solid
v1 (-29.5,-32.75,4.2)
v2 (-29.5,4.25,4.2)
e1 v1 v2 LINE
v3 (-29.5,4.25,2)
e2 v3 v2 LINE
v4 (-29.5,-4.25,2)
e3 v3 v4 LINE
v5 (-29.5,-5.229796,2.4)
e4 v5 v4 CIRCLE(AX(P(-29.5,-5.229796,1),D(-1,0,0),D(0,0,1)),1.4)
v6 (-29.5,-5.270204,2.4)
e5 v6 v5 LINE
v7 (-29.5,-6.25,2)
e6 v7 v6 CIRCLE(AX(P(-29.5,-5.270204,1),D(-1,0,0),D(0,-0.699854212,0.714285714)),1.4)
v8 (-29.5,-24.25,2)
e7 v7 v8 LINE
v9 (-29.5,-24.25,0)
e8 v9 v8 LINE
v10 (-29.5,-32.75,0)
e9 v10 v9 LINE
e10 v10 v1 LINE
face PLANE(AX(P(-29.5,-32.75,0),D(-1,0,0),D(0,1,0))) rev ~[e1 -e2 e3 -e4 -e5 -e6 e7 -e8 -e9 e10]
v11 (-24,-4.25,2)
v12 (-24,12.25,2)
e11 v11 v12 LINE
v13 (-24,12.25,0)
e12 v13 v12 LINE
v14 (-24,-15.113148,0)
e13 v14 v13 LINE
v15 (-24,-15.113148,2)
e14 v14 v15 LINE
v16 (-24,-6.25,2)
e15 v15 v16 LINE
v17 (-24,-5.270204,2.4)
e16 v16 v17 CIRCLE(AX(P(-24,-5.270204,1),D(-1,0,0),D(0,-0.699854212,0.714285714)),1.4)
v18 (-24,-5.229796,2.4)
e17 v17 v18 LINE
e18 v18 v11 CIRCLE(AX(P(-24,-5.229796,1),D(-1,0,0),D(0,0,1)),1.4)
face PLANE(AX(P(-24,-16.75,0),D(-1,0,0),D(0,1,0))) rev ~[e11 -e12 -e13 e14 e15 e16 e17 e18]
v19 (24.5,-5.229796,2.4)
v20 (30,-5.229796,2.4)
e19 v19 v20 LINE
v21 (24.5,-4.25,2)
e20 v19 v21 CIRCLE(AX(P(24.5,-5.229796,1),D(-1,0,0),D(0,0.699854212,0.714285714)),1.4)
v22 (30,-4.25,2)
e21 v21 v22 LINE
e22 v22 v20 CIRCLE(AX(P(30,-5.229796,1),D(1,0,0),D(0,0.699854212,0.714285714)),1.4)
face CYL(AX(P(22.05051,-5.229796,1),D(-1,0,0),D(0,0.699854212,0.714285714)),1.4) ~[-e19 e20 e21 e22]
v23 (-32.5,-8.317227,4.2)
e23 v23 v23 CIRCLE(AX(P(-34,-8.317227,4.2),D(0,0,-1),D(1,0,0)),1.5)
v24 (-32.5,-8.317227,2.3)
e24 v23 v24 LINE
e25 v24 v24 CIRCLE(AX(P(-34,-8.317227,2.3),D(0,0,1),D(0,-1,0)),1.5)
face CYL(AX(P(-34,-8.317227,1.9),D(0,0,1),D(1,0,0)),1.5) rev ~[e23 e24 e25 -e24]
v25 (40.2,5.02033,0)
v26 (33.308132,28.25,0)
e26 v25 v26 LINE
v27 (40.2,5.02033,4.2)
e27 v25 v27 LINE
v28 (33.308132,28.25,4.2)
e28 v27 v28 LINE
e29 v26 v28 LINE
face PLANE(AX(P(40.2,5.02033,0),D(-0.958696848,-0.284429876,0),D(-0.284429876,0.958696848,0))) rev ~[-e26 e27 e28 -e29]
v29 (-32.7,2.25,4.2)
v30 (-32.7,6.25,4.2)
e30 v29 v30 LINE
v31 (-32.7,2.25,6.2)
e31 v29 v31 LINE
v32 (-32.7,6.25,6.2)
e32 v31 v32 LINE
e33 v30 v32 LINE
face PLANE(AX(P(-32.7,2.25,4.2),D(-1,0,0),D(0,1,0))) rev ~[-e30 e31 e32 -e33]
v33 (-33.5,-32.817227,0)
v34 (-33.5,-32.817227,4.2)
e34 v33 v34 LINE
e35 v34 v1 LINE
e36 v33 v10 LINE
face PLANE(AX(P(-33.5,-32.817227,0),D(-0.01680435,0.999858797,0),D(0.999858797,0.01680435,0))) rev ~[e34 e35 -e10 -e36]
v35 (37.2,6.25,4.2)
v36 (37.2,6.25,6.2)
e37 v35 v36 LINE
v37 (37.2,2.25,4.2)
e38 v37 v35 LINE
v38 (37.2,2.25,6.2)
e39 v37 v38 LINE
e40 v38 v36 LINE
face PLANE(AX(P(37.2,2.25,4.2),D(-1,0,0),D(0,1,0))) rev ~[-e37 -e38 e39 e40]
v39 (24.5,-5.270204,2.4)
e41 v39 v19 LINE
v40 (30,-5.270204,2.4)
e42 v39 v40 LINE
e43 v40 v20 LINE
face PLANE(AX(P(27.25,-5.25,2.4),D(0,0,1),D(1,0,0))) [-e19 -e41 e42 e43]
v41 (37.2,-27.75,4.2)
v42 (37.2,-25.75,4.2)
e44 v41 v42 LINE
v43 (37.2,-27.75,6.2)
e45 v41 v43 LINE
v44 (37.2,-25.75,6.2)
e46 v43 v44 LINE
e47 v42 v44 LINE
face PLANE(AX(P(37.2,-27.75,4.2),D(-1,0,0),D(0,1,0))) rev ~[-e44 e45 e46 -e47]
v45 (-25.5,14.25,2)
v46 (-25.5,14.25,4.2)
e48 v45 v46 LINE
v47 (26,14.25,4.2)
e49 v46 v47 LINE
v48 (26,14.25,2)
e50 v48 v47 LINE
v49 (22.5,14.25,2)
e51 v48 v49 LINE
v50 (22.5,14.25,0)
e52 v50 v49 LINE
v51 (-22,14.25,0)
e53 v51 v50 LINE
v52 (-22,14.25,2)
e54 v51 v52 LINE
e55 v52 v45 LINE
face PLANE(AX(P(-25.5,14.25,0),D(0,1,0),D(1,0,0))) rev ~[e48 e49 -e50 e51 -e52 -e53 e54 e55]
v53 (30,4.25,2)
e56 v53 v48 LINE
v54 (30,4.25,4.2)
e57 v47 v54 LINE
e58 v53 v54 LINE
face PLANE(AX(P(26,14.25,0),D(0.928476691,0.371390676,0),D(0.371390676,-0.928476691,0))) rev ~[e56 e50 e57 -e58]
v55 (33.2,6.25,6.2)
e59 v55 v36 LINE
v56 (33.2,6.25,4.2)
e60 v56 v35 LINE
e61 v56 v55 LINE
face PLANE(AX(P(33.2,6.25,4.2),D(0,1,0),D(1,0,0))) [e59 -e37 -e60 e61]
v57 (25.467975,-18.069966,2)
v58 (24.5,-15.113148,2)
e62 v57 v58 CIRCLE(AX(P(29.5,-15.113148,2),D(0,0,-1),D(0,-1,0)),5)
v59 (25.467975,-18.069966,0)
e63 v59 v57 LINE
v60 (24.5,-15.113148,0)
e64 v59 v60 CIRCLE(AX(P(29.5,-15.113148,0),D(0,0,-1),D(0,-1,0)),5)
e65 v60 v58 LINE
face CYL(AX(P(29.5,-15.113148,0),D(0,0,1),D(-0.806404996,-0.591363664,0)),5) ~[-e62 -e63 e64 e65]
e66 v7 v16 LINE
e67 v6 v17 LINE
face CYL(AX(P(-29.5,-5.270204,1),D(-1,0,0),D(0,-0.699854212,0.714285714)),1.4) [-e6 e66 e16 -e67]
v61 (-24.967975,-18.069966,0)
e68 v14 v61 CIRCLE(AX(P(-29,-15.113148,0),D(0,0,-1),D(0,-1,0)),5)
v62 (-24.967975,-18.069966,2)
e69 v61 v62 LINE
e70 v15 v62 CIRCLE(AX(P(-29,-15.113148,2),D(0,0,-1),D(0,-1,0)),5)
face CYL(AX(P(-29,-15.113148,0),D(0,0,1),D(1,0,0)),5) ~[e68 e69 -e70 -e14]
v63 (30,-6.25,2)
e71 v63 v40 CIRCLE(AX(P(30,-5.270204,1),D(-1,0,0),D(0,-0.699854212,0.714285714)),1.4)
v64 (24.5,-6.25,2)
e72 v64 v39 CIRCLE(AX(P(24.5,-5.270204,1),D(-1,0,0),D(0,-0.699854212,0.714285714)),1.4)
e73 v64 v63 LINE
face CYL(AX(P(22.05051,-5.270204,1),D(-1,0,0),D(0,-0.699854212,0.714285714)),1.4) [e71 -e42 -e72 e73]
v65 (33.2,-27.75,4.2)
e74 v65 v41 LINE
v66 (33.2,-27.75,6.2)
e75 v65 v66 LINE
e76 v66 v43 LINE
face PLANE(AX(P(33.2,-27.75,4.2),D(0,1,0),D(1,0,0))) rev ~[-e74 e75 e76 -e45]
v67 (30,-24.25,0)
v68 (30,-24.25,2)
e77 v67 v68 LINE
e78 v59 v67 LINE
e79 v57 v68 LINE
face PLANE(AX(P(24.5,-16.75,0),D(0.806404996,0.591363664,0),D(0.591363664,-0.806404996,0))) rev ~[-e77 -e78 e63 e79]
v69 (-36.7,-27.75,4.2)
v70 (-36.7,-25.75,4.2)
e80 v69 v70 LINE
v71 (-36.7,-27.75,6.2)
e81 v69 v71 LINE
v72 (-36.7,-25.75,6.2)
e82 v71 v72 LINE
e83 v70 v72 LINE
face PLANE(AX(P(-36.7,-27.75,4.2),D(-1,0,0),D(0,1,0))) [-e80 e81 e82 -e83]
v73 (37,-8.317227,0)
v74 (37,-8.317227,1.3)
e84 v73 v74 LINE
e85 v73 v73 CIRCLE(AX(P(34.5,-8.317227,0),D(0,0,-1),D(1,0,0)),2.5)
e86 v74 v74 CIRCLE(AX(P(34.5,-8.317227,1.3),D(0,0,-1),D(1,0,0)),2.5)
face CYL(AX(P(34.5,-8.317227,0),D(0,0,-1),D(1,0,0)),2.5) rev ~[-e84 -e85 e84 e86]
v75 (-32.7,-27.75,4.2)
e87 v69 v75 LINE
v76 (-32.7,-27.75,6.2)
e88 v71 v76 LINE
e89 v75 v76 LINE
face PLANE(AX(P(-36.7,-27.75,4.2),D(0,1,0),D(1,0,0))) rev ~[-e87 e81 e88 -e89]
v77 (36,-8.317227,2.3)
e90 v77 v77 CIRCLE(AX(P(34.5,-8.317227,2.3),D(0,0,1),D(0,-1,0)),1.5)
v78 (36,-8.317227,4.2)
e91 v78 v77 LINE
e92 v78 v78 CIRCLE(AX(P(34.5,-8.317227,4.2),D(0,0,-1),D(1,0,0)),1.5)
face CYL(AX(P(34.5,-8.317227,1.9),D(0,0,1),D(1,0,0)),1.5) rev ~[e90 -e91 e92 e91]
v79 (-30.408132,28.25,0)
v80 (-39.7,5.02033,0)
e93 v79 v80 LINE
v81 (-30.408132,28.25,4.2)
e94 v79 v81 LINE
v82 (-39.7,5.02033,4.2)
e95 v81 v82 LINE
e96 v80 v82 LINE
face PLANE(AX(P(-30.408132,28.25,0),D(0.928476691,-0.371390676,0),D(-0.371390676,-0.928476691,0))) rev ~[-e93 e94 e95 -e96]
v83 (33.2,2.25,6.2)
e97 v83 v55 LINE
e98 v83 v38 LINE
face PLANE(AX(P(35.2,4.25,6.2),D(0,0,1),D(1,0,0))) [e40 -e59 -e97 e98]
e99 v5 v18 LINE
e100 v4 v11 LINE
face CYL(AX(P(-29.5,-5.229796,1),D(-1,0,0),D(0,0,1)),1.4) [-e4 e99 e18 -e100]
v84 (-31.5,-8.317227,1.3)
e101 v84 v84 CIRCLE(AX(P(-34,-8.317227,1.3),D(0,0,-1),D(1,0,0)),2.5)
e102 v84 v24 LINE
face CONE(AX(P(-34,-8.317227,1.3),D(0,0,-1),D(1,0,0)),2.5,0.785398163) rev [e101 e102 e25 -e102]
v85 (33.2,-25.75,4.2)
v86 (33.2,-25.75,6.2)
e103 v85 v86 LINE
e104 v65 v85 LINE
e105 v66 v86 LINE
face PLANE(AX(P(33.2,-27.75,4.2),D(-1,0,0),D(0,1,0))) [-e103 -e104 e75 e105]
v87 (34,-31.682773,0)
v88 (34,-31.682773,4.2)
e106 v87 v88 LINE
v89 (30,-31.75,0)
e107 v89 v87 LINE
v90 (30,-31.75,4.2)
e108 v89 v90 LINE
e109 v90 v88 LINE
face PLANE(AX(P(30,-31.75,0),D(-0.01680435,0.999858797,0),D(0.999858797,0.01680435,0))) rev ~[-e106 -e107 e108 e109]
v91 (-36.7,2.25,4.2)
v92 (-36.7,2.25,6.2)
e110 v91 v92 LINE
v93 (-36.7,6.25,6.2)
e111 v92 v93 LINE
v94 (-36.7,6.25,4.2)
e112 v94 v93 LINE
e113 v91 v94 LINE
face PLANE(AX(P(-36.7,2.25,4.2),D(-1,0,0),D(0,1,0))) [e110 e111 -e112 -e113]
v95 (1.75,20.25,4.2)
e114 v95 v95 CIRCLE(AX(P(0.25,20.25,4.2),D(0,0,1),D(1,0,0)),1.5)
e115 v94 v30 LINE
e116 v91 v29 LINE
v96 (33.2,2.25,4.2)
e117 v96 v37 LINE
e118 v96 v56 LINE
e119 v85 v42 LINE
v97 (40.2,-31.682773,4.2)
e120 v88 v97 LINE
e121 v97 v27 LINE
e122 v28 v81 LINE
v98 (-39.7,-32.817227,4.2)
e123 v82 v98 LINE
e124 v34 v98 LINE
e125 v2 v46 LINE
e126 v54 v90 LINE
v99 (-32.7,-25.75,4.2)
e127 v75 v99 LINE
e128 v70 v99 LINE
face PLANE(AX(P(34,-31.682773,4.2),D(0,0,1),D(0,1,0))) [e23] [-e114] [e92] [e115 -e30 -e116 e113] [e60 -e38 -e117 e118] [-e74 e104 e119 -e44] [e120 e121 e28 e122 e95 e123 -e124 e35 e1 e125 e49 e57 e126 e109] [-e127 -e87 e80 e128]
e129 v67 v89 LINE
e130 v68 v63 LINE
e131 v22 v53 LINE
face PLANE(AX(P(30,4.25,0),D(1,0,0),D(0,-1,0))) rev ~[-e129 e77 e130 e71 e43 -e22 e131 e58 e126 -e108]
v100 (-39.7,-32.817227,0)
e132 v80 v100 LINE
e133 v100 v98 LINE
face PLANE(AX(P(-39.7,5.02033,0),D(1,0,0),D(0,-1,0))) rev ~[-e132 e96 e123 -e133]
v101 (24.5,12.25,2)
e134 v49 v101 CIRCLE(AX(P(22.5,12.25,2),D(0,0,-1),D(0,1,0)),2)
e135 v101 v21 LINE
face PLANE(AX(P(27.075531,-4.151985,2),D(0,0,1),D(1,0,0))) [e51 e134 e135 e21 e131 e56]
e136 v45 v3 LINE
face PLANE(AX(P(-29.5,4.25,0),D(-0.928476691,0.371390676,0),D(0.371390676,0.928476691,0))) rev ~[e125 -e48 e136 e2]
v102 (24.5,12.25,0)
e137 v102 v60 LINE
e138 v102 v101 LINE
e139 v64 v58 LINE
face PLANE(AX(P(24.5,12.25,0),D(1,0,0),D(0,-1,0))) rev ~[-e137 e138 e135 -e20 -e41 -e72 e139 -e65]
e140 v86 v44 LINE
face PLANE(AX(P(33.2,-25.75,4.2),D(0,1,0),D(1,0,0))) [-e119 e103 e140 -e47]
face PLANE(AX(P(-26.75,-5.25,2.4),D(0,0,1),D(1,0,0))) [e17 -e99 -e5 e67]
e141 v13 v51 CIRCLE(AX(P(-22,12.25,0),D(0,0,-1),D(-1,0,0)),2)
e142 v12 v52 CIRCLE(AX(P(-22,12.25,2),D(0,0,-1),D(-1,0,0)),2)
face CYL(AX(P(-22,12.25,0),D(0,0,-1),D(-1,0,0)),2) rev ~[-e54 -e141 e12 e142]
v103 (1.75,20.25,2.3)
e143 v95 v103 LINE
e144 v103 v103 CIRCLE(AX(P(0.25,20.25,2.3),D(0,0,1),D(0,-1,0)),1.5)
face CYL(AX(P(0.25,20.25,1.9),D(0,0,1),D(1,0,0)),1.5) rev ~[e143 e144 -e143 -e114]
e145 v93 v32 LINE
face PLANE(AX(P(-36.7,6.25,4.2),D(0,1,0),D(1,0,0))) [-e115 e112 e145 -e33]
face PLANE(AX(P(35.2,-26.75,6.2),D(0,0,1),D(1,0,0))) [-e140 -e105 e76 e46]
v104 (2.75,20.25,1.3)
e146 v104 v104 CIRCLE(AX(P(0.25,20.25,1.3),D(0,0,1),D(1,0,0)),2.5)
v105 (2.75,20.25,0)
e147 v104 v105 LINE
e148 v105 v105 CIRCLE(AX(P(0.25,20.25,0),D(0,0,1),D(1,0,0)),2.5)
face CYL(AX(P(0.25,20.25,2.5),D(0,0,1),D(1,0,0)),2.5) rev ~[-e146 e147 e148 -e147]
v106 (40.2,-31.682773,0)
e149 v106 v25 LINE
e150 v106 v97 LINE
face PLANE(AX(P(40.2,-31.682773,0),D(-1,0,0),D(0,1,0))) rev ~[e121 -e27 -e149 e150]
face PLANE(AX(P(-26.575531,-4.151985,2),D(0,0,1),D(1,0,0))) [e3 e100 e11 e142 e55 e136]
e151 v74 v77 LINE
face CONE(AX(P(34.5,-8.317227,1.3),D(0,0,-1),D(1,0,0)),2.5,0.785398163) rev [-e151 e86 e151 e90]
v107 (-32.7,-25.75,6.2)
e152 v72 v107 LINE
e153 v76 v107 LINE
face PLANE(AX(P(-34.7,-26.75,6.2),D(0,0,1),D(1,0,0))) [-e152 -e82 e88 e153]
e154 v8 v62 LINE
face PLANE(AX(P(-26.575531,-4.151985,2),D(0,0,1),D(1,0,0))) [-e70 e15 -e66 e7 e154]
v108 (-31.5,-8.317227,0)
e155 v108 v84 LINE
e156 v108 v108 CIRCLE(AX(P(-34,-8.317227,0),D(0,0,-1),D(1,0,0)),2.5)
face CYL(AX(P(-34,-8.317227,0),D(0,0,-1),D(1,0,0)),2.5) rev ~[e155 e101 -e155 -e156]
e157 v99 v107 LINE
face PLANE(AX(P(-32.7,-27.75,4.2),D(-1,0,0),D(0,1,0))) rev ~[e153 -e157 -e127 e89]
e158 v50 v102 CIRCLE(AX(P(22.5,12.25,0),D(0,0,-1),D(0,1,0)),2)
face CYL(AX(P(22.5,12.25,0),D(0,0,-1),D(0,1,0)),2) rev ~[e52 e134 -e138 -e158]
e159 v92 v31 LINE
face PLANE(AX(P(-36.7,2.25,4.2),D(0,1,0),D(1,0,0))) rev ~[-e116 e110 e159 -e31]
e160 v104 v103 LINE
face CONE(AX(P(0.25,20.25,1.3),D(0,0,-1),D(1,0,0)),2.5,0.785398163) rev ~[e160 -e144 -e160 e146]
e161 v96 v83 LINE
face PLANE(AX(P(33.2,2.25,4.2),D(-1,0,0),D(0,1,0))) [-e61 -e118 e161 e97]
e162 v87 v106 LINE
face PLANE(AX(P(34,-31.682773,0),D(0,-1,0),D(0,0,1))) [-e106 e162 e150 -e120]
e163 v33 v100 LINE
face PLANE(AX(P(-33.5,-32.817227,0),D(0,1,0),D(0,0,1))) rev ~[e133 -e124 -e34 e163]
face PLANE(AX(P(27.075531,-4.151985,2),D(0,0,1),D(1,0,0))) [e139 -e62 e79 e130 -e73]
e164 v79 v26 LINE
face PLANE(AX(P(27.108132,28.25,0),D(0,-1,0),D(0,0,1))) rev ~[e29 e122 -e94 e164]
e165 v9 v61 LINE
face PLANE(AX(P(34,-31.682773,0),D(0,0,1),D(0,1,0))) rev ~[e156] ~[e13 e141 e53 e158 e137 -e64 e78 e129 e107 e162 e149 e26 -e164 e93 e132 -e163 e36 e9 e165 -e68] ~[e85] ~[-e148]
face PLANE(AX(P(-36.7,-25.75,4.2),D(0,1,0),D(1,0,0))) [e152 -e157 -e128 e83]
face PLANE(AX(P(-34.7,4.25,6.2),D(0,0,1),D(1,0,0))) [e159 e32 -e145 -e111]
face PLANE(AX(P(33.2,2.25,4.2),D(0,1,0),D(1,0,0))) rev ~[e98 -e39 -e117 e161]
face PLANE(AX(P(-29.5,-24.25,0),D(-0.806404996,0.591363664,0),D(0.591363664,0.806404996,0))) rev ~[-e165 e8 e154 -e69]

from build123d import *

# Parameters (mm, degrees)
F1_DEPTH      = 2
F2_DEPTH      = 4.2
F3_DEPTH      = 6.2
F4_DEPTH      = 6.2
F5_W          = 4
F5_H          = 2
F5_H_2        = 4
F6_DEPTH      = 2
F7_R          = 2.5
F7_R_2        = 1.5
F8_DEPTH      = 2.5
F9_DEPTH      = 4.5
F10_R         = 5
F12_START     = -1.7
F11_R         = 2.5
F11_R_2       = 1.5
F12_DEPTH     = 5.1
F13_DEPTH     = 4.2
F14_W         = 5.5
F14_H         = 2
F15_DEPTH     = 0.4
F16_T1_DEPTH  = 7.9494897428
F16_T3_DEPTH  = 7.9494897428
F17_S5_R      = 1.5
F17_T6_DEPTH  = 5
F17_S11_R     = 1.5
F17_T12_DEPTH = 5
F17_S17_R     = 1.5
F17_T18_DEPTH = 5


# Not quite as in the source:
# - a fillet or chamfer that OpenCascade refuses, or shapes differently, is made with other operations: its cross-section is extruded or revolved along the edge and cut away or added


with BuildPart() as f1:
    # F0 (on Top) → F1 (new body)
    with BuildSketch(Plane.XY):
        with BuildLine():
            Line((-22, 14.25), (-25.5, 14.25))
            Line((-25.5, 14.25), (-29.5, 4.25))
            Line((-29.5, 4.25), (-29.5, -24.25))
            Line((-29.5, -24.25), (-24, -16.75))
            Line((-24, -16.75), (-24, 12.25))
            ThreePointArc((-24, 12.25), (-23.4142135624, 13.6642135624), (-22, 14.25))
        make_face()
    extrude(amount=F1_DEPTH)



with BuildPart() as f1b:
    # F0 (on Top) → F1, piece 2 (new body)
    with BuildSketch(Plane.XY):
        with BuildLine():
            Line((26, 14.25), (22.5, 14.25))
            ThreePointArc((22.5, 14.25), (23.9142135624, 13.6642135624), (24.5, 12.25))
            Line((24.5, 12.25), (24.5, -16.75))
            Line((24.5, -16.75), (30, -24.25))
            Line((30, -24.25), (30, 4.25))
            Line((30, 4.25), (26, 14.25))
        make_face()
    extrude(amount=F1_DEPTH)


with BuildPart() as f1_1:
    add(f1.part)

    add(f1b.part)  # F2 merges F1b
    # F0 (on Top) → F2 (join)
    with BuildSketch(Plane.XY):
        Polygon((-29.5, 4.25), (-25.5, 14.25), (-22, 14.25), (22.5, 14.25), (26, 14.25), (30, 4.25), (30, -24.25), (30, -31.75), (34, -31.6827731092), (34, 5.0203296143), (27.1081318457, 28.25), (-24.2081318457, 28.25), (-33.5, 5.0203296143), (-33.5, -32.8172268908), (-29.5, -32.75), (-29.5, -24.25), align=None)
    extrude(amount=F2_DEPTH)

    # F3 (add): faces of the model
    f3_faces = [f1_1.faces().sort_by_distance(p)[0] for p in [
        (-33.5, -13.8984486382, 2.1),
        (-28.8540659229, 16.6351648071, 2.1),
    ]]
    extrude(f3_faces, amount=F3_DEPTH, dir=(-1, 0, 0))

    # F4 (add): faces of the model
    f4_faces = [f1_1.faces().sort_by_distance(p)[0] for p in [
        (34, -13.3312217475, 2.1),
        (30.5540659229, 16.6351648071, 2.1),
    ]]
    extrude(f4_faces, amount=F4_DEPTH, dir=(1, 0, 0))

    # F5 (on face) → F6 (join)
    with BuildSketch(Plane.XY.offset(4.2)):
        with Locations((-34.7, -26.75)):
            Rectangle(F5_W, F5_H)
        with Locations((35.2, -26.75)):
            Rectangle(F5_W, F5_H)
        with Locations((35.2, 4.25)):
            Rectangle(F5_W, F5_H_2)
        with Locations((-34.7, 4.25)):
            Rectangle(F5_W, F5_H_2)
    extrude(amount=F6_DEPTH)

    # F7 (on face) → F8 (cut)
    with BuildSketch(Plane(origin=(0, 0, 0), x_dir=(1, 0, 0), z_dir=(0, 0, -1))):
        with Locations((-34, 8.3172268908)):
            Circle(F7_R)
        with Locations((-34, 8.3172268908)):
            Circle(F7_R_2, mode=Mode.SUBTRACT)
        with Locations((34.5, 8.3172268908)):
            Circle(F7_R)
        with Locations((34.5, 8.3172268908)):
            Circle(F7_R_2, mode=Mode.SUBTRACT)
    extrude(amount=-F8_DEPTH, mode=Mode.SUBTRACT)

    # F9 (cut): faces of the model
    f9_faces = [f1_1.faces().sort_by_distance(p)[0] for p in [
        (-34, -8.3172268908, 0),
        (34.5, -8.3172268908, 0),
    ]]
    extrude(f9_faces, amount=-F9_DEPTH, mode=Mode.SUBTRACT)

    # F10
    f10_edges = [f1_1.edges().sort_by_distance(p)[0] for p in [
        (24.5, -16.75, 1),
        (-24, -16.75, 1),
    ]]
    fillet(f10_edges, radius=F10_R)

    # F11 (on face) → F12 (cut)
    with BuildSketch(Plane.XY.offset(4.2).offset(F12_START)):
        with Locations((0.25, 20.25)):
            Circle(F11_R)
        with Locations((0.25, 20.25)):
            Circle(F11_R_2, mode=Mode.SUBTRACT)
    extrude(amount=-F12_DEPTH, mode=Mode.SUBTRACT)

    # F11 (on face) → F13 (cut)
    with BuildSketch(Plane.XY.offset(4.2)):
        with Locations((0.25, 20.25)):
            Circle(F11_R_2)
    extrude(amount=-F13_DEPTH, mode=Mode.SUBTRACT)

    # F14 (on face) → F15 (join)
    with BuildSketch(Plane.XY.offset(2)):
        with Locations((27.25, -5.25)):
            Rectangle(F14_W, F14_H)
        with Locations((-26.75, -5.25)):
            Rectangle(F14_W, F14_H)
    extrude(amount=F15_DEPTH)

    # F16: fillet of radius 1.4 on 4 edges, made by hand

    # F16_s2 → F16_t1 (cut)
    with BuildSketch(Plane.YZ.offset(-29.5)):
        with BuildLine():
            ThreePointArc((-6.25, 2), (-5.7993543651, 2.2961481397), (-5.2702041029, 2.4))
            Line((-5.2702041029, 2.4), (-6.25, 2.4))
            Line((-6.25, 2.4), (-6.25, 2))
        make_face()
        with BuildLine():
            ThreePointArc((-5.2297958971, 2.4), (-4.7006456349, 2.2961481397), (-4.25, 2))
            Line((-4.25, 2), (-4.25, 2.4))
            Line((-4.25, 2.4), (-5.2297958971, 2.4))
        make_face()
    extrude(amount=F16_T1_DEPTH, mode=Mode.SUBTRACT)

    # F16_s4 → F16_t3 (cut)
    with BuildSketch(Plane.YZ.offset(22.0505102572)):
        with BuildLine():
            ThreePointArc((-4.25, 2), (-4.7006456349, 2.2961481397), (-5.2297958971, 2.4))
            Line((-5.2297958971, 2.4), (-4.25, 2.4))
            Line((-4.25, 2.4), (-4.25, 2))
        make_face()
        with BuildLine():
            ThreePointArc((-6.25, 2), (-5.7993543651, 2.2961481397), (-5.2702041029, 2.4))
            Line((-5.2702041029, 2.4), (-6.25, 2.4))
            Line((-6.25, 2.4), (-6.25, 2))
        make_face()
    extrude(amount=F16_T3_DEPTH, mode=Mode.SUBTRACT)

    # F17: chamfer of 1.2 on 3 edges, made by hand


with BuildPart() as f17_tool2:
    # F17_s3 → F17_t4 (revolve)
    with BuildSketch(Plane.XZ.offset(8.3172268908)):
        Polygon((-31.5, 1.3), (-32.7, 2.5), (-31.5, 2.5), align=None)
    revolve(axis=Axis((-34, -8.3172268908, 2.5), (0, 0, -1)))

    # F17_s5 → F17_t6 (cut, symmetric)
    with BuildSketch(Plane.XY.offset(1.9)):
        with Locations((-34, -8.3172268908)):
            Circle(F17_S5_R)
    extrude(amount=F17_T6_DEPTH, both=True, mode=Mode.SUBTRACT)


with BuildPart() as f1_2:
    add(f1_1.part)

    # F17_t1: union F17_tool2
    add(f17_tool2.part)


with BuildPart() as f17_tool8:
    # F17_s9 → F17_t10 (revolve)
    with BuildSketch(Plane.XZ.offset(8.3172268908)):
        Polygon((37, 1.3), (35.8, 2.5), (37, 2.5), align=None)
    revolve(axis=Axis((34.5, -8.3172268908, 2.5), (0, 0, -1)))

    # F17_s11 → F17_t12 (cut, symmetric)
    with BuildSketch(Plane.XY.offset(1.9)):
        with Locations((34.5, -8.3172268908)):
            Circle(F17_S11_R)
    extrude(amount=F17_T12_DEPTH, both=True, mode=Mode.SUBTRACT)


with BuildPart() as f1_3:
    add(f1_2.part)

    # F17_t7: union F17_tool8
    add(f17_tool8.part)


with BuildPart() as f17_tool14:
    # F17_s15 → F17_t16 (revolve)
    with BuildSketch(Plane.XZ.offset(-20.25)):
        Polygon((2.75, 1.3), (1.55, 2.5), (2.75, 2.5), align=None)
    revolve(axis=Axis((0.25, 20.25, 2.5), (0, 0, 1)))

    # F17_s17 → F17_t18 (cut, symmetric)
    with BuildSketch(Plane.XY.offset(1.9)):
        with Locations((0.25, 20.25)):
            Circle(F17_S17_R)
    extrude(amount=F17_T18_DEPTH, both=True, mode=Mode.SUBTRACT)


with BuildPart() as f1_4:
    add(f1_3.part)

    # F17_t13: union F17_tool14
    add(f17_tool14.part)


solid = f1_4.part
